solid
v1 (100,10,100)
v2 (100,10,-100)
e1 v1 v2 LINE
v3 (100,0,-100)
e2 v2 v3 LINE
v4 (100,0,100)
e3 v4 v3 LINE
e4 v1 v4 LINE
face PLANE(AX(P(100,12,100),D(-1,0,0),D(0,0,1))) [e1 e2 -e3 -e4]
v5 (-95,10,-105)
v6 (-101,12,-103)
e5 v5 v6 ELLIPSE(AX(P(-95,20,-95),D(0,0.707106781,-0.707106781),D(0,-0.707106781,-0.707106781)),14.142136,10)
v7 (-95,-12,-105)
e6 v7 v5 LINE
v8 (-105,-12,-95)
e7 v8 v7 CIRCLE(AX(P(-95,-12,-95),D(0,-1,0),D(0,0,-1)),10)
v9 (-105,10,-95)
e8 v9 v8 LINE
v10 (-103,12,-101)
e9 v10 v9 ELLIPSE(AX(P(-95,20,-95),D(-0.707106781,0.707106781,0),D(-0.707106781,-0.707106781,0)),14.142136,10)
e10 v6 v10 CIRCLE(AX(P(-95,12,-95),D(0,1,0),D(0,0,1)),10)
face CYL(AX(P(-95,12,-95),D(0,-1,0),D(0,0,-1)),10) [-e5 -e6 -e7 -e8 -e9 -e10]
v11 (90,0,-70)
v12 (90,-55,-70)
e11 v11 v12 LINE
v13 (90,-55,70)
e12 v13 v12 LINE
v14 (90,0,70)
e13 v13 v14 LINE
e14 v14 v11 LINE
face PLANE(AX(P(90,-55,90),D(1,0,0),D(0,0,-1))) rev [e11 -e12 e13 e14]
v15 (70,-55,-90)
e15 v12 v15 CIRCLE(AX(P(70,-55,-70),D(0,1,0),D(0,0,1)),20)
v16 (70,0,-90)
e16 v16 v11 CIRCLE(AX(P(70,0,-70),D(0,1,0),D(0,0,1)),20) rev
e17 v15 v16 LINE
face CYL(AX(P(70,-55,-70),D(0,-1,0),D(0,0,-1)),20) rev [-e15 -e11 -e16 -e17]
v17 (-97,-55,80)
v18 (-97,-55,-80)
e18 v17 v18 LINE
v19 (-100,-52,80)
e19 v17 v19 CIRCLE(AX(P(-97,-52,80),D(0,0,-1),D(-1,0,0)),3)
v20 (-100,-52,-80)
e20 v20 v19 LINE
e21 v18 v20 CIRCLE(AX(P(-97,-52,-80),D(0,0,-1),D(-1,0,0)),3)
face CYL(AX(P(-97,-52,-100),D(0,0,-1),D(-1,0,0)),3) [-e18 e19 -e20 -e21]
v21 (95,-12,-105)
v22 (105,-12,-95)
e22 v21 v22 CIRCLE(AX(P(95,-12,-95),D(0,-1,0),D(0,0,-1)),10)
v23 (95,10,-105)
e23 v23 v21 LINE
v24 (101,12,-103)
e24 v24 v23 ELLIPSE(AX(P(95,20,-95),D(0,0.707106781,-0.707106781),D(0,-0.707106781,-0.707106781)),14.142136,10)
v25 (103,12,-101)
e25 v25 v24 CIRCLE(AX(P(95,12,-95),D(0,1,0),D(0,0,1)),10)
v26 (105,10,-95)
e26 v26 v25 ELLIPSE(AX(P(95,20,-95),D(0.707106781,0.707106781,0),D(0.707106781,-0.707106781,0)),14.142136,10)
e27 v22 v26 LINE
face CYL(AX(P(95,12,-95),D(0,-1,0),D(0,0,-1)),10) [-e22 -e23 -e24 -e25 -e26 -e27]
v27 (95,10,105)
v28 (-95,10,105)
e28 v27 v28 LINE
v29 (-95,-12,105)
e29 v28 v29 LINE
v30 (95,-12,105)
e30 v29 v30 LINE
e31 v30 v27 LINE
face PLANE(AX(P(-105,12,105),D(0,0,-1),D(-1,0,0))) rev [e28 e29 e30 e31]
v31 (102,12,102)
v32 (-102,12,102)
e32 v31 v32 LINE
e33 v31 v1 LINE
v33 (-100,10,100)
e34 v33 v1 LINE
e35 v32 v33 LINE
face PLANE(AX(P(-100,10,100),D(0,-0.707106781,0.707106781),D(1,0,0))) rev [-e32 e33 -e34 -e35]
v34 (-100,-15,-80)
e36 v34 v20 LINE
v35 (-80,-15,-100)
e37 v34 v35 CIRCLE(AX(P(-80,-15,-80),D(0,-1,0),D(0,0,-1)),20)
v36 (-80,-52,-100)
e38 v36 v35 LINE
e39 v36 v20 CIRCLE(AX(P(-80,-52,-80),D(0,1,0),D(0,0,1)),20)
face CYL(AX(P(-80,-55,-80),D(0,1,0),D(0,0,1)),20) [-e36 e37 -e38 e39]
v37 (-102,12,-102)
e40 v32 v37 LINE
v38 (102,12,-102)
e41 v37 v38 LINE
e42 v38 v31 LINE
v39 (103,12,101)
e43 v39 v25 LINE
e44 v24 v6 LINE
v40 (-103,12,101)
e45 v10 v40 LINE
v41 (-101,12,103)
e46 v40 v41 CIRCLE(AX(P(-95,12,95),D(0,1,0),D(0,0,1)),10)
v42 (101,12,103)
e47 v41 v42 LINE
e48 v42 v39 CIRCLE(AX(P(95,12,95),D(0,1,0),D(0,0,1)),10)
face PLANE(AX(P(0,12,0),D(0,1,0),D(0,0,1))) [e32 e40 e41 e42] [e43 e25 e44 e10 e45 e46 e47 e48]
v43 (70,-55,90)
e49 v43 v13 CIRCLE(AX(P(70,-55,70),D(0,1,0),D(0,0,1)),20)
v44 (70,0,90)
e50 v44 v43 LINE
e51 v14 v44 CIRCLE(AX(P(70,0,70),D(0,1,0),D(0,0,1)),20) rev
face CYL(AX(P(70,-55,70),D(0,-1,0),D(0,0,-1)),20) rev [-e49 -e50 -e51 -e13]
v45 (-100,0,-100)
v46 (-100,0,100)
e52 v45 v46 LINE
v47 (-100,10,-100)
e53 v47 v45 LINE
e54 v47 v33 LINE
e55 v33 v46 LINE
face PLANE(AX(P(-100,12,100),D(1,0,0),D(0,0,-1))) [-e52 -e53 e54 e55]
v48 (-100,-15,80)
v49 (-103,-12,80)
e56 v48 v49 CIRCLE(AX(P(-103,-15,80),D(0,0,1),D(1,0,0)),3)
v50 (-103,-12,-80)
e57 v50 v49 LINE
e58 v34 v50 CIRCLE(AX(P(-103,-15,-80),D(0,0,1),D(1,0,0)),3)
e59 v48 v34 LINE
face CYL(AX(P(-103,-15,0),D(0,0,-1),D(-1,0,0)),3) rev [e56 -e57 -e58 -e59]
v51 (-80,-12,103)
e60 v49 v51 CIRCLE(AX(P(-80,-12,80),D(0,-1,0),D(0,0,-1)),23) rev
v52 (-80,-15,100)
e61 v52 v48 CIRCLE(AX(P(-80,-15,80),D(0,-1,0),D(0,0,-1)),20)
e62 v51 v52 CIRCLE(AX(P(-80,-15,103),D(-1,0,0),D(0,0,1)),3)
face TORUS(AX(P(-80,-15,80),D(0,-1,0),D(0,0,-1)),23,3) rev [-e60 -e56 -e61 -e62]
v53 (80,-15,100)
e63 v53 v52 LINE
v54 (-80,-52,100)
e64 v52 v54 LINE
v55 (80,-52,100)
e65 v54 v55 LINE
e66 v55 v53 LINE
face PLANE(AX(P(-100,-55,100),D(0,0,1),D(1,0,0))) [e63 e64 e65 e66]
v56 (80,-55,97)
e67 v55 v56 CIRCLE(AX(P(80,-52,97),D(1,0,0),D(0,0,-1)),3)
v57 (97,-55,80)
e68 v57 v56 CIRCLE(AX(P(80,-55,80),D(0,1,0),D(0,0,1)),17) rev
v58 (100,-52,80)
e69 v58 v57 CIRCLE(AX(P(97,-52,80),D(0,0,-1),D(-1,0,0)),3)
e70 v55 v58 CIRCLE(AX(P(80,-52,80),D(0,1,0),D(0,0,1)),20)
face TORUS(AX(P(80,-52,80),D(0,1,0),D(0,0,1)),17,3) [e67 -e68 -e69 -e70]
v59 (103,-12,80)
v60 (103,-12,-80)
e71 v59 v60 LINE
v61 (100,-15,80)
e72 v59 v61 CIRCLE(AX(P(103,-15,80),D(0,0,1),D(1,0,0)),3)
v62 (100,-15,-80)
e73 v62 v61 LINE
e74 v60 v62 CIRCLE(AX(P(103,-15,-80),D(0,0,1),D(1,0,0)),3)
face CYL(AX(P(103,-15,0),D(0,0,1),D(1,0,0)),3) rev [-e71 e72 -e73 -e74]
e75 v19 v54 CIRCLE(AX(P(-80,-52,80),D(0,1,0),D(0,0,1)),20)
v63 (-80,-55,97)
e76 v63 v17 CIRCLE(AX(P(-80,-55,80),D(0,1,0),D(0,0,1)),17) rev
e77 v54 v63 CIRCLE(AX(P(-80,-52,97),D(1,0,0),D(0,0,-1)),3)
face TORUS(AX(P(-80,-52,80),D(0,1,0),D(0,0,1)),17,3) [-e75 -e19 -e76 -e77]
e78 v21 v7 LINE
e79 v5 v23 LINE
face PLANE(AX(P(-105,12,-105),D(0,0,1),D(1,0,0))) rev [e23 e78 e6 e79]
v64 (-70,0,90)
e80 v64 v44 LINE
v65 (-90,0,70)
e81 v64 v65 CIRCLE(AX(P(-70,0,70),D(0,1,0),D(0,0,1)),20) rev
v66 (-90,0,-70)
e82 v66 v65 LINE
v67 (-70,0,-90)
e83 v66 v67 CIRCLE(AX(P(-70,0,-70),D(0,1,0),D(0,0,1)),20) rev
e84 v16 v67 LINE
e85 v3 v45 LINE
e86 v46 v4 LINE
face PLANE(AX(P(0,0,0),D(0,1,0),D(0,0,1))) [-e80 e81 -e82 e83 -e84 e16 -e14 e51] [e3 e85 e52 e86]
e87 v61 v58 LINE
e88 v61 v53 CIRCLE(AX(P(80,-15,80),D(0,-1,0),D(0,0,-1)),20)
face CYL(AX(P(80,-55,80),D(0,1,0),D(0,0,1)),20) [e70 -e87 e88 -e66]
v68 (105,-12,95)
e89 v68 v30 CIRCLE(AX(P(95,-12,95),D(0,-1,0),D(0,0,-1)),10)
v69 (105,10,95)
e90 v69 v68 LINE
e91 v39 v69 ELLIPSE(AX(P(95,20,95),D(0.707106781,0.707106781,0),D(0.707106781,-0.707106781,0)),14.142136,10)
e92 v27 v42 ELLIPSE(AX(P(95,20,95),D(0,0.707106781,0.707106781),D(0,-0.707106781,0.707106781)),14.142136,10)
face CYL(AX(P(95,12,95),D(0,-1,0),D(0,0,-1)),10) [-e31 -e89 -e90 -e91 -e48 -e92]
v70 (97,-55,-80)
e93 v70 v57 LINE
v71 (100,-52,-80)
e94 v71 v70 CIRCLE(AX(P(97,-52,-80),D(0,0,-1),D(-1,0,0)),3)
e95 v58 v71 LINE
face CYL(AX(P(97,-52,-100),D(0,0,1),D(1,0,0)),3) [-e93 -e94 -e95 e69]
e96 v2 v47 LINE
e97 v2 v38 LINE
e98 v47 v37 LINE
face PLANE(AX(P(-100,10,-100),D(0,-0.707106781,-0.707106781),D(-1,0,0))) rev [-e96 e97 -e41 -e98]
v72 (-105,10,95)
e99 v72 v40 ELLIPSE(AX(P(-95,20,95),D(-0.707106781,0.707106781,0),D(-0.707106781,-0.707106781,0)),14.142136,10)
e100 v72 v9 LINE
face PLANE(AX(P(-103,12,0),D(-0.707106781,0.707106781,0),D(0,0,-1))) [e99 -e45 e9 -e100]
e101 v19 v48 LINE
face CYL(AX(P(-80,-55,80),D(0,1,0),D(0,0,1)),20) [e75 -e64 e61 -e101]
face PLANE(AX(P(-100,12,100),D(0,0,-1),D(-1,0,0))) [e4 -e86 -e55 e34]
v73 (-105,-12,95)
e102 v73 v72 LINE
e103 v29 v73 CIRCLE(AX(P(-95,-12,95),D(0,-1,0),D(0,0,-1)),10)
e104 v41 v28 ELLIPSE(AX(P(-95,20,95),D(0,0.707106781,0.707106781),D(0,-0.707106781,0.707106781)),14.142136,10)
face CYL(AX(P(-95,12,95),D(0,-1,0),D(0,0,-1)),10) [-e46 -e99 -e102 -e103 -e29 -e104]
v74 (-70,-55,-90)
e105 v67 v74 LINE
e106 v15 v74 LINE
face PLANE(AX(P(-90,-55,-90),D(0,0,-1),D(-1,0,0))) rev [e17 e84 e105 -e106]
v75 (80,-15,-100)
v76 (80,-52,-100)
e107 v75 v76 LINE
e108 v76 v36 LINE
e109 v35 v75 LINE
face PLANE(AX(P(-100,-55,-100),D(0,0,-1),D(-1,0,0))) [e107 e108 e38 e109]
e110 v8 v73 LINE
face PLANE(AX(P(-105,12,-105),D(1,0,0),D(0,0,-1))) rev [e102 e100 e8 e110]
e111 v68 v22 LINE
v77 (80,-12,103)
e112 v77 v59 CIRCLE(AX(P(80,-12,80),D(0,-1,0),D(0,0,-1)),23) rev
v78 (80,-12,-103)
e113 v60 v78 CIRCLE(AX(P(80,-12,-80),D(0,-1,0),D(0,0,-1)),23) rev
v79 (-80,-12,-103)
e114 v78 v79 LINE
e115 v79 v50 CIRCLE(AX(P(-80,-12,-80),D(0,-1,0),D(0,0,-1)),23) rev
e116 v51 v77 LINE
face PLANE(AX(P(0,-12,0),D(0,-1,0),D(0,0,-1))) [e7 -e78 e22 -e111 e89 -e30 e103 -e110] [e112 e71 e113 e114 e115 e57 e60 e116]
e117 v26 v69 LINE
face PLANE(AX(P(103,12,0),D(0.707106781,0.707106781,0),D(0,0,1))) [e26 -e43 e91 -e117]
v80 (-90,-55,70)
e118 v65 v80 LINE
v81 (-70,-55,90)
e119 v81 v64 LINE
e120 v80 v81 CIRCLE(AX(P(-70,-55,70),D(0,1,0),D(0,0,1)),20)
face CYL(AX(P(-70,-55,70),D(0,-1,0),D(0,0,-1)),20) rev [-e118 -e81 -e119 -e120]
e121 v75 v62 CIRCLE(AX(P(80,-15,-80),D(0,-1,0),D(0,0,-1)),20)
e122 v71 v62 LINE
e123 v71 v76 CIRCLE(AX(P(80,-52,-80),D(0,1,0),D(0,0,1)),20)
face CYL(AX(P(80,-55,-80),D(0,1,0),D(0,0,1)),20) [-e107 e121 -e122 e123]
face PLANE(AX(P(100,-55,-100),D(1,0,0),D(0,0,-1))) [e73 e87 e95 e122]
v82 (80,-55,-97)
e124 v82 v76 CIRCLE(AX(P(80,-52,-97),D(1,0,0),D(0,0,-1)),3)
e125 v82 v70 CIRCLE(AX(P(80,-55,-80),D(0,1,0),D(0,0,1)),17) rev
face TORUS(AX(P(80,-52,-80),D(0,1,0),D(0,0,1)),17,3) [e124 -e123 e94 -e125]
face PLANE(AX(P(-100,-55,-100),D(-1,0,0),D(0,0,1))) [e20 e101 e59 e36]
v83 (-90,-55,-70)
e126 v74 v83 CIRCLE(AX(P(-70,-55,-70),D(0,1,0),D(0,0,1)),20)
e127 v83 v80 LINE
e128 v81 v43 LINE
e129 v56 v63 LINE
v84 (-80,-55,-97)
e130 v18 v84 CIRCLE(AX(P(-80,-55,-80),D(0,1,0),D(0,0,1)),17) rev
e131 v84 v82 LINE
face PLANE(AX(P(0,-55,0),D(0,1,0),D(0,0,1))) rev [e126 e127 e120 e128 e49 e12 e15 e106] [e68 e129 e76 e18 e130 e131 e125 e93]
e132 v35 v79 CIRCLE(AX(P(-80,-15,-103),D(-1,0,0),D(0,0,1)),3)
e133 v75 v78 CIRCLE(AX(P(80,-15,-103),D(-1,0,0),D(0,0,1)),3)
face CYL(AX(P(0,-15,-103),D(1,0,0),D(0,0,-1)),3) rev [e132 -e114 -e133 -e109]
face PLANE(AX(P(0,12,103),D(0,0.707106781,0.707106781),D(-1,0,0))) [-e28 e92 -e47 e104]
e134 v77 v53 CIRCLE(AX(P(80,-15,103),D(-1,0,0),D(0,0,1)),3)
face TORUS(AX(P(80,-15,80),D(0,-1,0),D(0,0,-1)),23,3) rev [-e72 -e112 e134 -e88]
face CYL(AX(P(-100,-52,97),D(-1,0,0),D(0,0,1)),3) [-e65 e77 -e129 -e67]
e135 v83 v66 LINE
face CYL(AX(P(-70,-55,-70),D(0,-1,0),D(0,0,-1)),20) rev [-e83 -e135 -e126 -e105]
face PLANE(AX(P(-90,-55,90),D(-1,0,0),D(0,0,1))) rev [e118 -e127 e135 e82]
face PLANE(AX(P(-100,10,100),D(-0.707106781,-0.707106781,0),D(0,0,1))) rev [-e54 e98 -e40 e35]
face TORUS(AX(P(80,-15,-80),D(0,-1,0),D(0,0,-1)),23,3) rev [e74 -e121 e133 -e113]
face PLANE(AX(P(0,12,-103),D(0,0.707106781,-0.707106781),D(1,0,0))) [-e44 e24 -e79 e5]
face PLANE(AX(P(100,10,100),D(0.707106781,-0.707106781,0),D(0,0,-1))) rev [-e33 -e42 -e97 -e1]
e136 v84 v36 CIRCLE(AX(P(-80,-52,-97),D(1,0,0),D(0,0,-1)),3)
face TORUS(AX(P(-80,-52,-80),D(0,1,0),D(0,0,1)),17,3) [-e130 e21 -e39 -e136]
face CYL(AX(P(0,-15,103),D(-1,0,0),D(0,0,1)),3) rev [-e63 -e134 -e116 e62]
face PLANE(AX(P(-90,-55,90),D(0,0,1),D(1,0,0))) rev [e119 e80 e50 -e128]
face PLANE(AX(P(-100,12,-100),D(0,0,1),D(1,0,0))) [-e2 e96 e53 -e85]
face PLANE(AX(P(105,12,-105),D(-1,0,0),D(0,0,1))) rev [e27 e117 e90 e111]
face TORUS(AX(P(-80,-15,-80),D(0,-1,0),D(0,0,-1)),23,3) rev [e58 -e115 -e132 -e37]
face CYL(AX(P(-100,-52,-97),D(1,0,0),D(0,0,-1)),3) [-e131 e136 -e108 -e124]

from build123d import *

# Parameters (mm, degrees)
SKETCH1_W               = 200
SKETCH1_H               = 200
BOSS_EXTRUDE1_DEPTH     = 55
FILLET1_R               = 20
SKETCH2_W               = 210
SKETCH2_H               = 210
SKETCH2_W_2             = 200
SKETCH2_H_2             = 200
BOSS_EXTRUDE2_DEPTH     = 12
SKETCH3_W               = 210
SKETCH3_H               = 210
BOSS_EXTRUDE3_DEPTH     = 12
CUT_EXTRUDE1_DEPTH      = 159.350876221
CUT_EXTRUDE1_DEPTH_BACK = 159.350876221
SKETCH5_W               = 180
SKETCH5_H               = 180
CHAMFER1_SIZE           = 2
FILLET2_R               = 10
FILLET3_R               = 3
FILLET4_R               = 20


with BuildPart() as part:
    # Sketch1 → Boss-Extrude1 (new body)
    with BuildSketch(Plane(origin=(0, 0, 0), x_dir=(1, 0, 0), z_dir=(0, 1, 0))):
        Rectangle(SKETCH1_W, SKETCH1_H)
    extrude(amount=-BOSS_EXTRUDE1_DEPTH)

    # Fillet1
    fillet1_edges = [part.edges().sort_by_distance(p)[0] for p in [
        (100, -27.5, 100),
        (-100, -27.5, 100),
        (-100, -27.5, -100),
        (100, -27.5, -100),
    ]]
    fillet(fillet1_edges, radius=FILLET1_R)

    # Sketch3 → Boss-Extrude3 (add)
    with BuildSketch(Plane(origin=(0, 0, 0), x_dir=(1, 0, 0), z_dir=(0, 1, 0))):
        Rectangle(SKETCH3_W, SKETCH3_H)
    extrude(amount=-BOSS_EXTRUDE3_DEPTH)


with BuildPart() as body_2:
    # Sketch2 → Boss-Extrude2 (new body)
    with BuildSketch(Plane(origin=(0, 0, 0), x_dir=(1, 0, 0), z_dir=(0, 1, 0))):
        Rectangle(SKETCH2_W, SKETCH2_H)
        Rectangle(SKETCH2_W_2, SKETCH2_H_2, mode=Mode.SUBTRACT)
    extrude(amount=BOSS_EXTRUDE2_DEPTH)

    # Combine2: union part
    add(part.part)

    # Sketch5 → Cut-Extrude1 (cut, two sides: drawn at the far end of the back side and taken through both)
    with BuildSketch(Plane(origin=(0, 0, 0), x_dir=(1, 0, 0), z_dir=(0, 1, 0)).offset(-CUT_EXTRUDE1_DEPTH_BACK)):
        Rectangle(SKETCH5_W, SKETCH5_H)
    extrude(amount=CUT_EXTRUDE1_DEPTH + CUT_EXTRUDE1_DEPTH_BACK, mode=Mode.SUBTRACT)

    # Chamfer1
    chamfer1_edges = [body_2.edges().sort_by_distance(p)[0] for p in [
        (-105, 12, 0),
        (100, 12, 0),
        (0, 12, 105),
        (0, 12, -100),
        (-100, 12, 0),
        (0, 12, 100),
        (105, 12, 0),
        (0, 12, -105),
    ]]
    chamfer(chamfer1_edges, length=CHAMFER1_SIZE)

    # Fillet2
    # the kernel refuses this fillet: 10 mm, written as the material it takes off along each edge
    with BuildSketch(Plane(origin=(105, 35, 105), x_dir=(-1, 0, 0), z_dir=(0, -1, 0)), Plane(origin=(-105, 35, 105), x_dir=(0, 0, -1), z_dir=(0, -1, 0)), Plane(origin=(-105, -37, -105), x_dir=(0, 0, 1), z_dir=(0, 1, 0))) as fillet2_piece_1:
        with BuildLine():
            CenterArc((FILLET2_R, FILLET2_R), FILLET2_R, 180, 90)
            Line((0, FILLET2_R), (0, 0))
            Line((0, 0), (FILLET2_R, 0))
        make_face()
    extrude(amount=72, mode=Mode.SUBTRACT)
    with BuildSketch(Plane(origin=(105, 35, -105), x_dir=(-1, 0, 0), z_dir=(0, -1, 0))) as fillet2_piece_2:
        with BuildLine():
            CenterArc((FILLET2_R, -FILLET2_R), FILLET2_R, 90, 90)
            Line((0, -FILLET2_R), (0, 0))
            Line((0, 0), (FILLET2_R, 0))
        make_face()
    extrude(amount=72, mode=Mode.SUBTRACT)

    # Fillet3
    fillet3_edges = [body_2.edges().sort_by_distance(p)[0] for p in [
        (100, -55, 0),
        (0, -55, 100),
        (-100, -55, 0),
        (0, -55, -100),
        (94.142135624, -55, -94.142135624),
        (94.142135624, -55, 94.142135624),
        (-94.142135624, -55, 94.142135624),
        (-94.142135624, -55, -94.142135624),
        (0, -12, -100),
        (-94.142135624, -12, -94.142135624),
        (-100, -12, 0),
        (-94.142135624, -12, 94.142135624),
        (0, -12, 100),
        (94.142135624, -12, 94.142135624),
        (100, -12, 0),
        (94.142135624, -12, -94.142135624),
    ]]
    fillet(fillet3_edges, radius=FILLET3_R)

    # Fillet4
    fillet4_edges = [body_2.edges().sort_by_distance(p)[0] for p in [
        (90, -27.5, -90),
        (90, -27.5, 90),
        (-90, -27.5, 90),
        (-90, -27.5, -90),
    ]]
    fillet(fillet4_edges, radius=FILLET4_R)


solid = body_2.part
